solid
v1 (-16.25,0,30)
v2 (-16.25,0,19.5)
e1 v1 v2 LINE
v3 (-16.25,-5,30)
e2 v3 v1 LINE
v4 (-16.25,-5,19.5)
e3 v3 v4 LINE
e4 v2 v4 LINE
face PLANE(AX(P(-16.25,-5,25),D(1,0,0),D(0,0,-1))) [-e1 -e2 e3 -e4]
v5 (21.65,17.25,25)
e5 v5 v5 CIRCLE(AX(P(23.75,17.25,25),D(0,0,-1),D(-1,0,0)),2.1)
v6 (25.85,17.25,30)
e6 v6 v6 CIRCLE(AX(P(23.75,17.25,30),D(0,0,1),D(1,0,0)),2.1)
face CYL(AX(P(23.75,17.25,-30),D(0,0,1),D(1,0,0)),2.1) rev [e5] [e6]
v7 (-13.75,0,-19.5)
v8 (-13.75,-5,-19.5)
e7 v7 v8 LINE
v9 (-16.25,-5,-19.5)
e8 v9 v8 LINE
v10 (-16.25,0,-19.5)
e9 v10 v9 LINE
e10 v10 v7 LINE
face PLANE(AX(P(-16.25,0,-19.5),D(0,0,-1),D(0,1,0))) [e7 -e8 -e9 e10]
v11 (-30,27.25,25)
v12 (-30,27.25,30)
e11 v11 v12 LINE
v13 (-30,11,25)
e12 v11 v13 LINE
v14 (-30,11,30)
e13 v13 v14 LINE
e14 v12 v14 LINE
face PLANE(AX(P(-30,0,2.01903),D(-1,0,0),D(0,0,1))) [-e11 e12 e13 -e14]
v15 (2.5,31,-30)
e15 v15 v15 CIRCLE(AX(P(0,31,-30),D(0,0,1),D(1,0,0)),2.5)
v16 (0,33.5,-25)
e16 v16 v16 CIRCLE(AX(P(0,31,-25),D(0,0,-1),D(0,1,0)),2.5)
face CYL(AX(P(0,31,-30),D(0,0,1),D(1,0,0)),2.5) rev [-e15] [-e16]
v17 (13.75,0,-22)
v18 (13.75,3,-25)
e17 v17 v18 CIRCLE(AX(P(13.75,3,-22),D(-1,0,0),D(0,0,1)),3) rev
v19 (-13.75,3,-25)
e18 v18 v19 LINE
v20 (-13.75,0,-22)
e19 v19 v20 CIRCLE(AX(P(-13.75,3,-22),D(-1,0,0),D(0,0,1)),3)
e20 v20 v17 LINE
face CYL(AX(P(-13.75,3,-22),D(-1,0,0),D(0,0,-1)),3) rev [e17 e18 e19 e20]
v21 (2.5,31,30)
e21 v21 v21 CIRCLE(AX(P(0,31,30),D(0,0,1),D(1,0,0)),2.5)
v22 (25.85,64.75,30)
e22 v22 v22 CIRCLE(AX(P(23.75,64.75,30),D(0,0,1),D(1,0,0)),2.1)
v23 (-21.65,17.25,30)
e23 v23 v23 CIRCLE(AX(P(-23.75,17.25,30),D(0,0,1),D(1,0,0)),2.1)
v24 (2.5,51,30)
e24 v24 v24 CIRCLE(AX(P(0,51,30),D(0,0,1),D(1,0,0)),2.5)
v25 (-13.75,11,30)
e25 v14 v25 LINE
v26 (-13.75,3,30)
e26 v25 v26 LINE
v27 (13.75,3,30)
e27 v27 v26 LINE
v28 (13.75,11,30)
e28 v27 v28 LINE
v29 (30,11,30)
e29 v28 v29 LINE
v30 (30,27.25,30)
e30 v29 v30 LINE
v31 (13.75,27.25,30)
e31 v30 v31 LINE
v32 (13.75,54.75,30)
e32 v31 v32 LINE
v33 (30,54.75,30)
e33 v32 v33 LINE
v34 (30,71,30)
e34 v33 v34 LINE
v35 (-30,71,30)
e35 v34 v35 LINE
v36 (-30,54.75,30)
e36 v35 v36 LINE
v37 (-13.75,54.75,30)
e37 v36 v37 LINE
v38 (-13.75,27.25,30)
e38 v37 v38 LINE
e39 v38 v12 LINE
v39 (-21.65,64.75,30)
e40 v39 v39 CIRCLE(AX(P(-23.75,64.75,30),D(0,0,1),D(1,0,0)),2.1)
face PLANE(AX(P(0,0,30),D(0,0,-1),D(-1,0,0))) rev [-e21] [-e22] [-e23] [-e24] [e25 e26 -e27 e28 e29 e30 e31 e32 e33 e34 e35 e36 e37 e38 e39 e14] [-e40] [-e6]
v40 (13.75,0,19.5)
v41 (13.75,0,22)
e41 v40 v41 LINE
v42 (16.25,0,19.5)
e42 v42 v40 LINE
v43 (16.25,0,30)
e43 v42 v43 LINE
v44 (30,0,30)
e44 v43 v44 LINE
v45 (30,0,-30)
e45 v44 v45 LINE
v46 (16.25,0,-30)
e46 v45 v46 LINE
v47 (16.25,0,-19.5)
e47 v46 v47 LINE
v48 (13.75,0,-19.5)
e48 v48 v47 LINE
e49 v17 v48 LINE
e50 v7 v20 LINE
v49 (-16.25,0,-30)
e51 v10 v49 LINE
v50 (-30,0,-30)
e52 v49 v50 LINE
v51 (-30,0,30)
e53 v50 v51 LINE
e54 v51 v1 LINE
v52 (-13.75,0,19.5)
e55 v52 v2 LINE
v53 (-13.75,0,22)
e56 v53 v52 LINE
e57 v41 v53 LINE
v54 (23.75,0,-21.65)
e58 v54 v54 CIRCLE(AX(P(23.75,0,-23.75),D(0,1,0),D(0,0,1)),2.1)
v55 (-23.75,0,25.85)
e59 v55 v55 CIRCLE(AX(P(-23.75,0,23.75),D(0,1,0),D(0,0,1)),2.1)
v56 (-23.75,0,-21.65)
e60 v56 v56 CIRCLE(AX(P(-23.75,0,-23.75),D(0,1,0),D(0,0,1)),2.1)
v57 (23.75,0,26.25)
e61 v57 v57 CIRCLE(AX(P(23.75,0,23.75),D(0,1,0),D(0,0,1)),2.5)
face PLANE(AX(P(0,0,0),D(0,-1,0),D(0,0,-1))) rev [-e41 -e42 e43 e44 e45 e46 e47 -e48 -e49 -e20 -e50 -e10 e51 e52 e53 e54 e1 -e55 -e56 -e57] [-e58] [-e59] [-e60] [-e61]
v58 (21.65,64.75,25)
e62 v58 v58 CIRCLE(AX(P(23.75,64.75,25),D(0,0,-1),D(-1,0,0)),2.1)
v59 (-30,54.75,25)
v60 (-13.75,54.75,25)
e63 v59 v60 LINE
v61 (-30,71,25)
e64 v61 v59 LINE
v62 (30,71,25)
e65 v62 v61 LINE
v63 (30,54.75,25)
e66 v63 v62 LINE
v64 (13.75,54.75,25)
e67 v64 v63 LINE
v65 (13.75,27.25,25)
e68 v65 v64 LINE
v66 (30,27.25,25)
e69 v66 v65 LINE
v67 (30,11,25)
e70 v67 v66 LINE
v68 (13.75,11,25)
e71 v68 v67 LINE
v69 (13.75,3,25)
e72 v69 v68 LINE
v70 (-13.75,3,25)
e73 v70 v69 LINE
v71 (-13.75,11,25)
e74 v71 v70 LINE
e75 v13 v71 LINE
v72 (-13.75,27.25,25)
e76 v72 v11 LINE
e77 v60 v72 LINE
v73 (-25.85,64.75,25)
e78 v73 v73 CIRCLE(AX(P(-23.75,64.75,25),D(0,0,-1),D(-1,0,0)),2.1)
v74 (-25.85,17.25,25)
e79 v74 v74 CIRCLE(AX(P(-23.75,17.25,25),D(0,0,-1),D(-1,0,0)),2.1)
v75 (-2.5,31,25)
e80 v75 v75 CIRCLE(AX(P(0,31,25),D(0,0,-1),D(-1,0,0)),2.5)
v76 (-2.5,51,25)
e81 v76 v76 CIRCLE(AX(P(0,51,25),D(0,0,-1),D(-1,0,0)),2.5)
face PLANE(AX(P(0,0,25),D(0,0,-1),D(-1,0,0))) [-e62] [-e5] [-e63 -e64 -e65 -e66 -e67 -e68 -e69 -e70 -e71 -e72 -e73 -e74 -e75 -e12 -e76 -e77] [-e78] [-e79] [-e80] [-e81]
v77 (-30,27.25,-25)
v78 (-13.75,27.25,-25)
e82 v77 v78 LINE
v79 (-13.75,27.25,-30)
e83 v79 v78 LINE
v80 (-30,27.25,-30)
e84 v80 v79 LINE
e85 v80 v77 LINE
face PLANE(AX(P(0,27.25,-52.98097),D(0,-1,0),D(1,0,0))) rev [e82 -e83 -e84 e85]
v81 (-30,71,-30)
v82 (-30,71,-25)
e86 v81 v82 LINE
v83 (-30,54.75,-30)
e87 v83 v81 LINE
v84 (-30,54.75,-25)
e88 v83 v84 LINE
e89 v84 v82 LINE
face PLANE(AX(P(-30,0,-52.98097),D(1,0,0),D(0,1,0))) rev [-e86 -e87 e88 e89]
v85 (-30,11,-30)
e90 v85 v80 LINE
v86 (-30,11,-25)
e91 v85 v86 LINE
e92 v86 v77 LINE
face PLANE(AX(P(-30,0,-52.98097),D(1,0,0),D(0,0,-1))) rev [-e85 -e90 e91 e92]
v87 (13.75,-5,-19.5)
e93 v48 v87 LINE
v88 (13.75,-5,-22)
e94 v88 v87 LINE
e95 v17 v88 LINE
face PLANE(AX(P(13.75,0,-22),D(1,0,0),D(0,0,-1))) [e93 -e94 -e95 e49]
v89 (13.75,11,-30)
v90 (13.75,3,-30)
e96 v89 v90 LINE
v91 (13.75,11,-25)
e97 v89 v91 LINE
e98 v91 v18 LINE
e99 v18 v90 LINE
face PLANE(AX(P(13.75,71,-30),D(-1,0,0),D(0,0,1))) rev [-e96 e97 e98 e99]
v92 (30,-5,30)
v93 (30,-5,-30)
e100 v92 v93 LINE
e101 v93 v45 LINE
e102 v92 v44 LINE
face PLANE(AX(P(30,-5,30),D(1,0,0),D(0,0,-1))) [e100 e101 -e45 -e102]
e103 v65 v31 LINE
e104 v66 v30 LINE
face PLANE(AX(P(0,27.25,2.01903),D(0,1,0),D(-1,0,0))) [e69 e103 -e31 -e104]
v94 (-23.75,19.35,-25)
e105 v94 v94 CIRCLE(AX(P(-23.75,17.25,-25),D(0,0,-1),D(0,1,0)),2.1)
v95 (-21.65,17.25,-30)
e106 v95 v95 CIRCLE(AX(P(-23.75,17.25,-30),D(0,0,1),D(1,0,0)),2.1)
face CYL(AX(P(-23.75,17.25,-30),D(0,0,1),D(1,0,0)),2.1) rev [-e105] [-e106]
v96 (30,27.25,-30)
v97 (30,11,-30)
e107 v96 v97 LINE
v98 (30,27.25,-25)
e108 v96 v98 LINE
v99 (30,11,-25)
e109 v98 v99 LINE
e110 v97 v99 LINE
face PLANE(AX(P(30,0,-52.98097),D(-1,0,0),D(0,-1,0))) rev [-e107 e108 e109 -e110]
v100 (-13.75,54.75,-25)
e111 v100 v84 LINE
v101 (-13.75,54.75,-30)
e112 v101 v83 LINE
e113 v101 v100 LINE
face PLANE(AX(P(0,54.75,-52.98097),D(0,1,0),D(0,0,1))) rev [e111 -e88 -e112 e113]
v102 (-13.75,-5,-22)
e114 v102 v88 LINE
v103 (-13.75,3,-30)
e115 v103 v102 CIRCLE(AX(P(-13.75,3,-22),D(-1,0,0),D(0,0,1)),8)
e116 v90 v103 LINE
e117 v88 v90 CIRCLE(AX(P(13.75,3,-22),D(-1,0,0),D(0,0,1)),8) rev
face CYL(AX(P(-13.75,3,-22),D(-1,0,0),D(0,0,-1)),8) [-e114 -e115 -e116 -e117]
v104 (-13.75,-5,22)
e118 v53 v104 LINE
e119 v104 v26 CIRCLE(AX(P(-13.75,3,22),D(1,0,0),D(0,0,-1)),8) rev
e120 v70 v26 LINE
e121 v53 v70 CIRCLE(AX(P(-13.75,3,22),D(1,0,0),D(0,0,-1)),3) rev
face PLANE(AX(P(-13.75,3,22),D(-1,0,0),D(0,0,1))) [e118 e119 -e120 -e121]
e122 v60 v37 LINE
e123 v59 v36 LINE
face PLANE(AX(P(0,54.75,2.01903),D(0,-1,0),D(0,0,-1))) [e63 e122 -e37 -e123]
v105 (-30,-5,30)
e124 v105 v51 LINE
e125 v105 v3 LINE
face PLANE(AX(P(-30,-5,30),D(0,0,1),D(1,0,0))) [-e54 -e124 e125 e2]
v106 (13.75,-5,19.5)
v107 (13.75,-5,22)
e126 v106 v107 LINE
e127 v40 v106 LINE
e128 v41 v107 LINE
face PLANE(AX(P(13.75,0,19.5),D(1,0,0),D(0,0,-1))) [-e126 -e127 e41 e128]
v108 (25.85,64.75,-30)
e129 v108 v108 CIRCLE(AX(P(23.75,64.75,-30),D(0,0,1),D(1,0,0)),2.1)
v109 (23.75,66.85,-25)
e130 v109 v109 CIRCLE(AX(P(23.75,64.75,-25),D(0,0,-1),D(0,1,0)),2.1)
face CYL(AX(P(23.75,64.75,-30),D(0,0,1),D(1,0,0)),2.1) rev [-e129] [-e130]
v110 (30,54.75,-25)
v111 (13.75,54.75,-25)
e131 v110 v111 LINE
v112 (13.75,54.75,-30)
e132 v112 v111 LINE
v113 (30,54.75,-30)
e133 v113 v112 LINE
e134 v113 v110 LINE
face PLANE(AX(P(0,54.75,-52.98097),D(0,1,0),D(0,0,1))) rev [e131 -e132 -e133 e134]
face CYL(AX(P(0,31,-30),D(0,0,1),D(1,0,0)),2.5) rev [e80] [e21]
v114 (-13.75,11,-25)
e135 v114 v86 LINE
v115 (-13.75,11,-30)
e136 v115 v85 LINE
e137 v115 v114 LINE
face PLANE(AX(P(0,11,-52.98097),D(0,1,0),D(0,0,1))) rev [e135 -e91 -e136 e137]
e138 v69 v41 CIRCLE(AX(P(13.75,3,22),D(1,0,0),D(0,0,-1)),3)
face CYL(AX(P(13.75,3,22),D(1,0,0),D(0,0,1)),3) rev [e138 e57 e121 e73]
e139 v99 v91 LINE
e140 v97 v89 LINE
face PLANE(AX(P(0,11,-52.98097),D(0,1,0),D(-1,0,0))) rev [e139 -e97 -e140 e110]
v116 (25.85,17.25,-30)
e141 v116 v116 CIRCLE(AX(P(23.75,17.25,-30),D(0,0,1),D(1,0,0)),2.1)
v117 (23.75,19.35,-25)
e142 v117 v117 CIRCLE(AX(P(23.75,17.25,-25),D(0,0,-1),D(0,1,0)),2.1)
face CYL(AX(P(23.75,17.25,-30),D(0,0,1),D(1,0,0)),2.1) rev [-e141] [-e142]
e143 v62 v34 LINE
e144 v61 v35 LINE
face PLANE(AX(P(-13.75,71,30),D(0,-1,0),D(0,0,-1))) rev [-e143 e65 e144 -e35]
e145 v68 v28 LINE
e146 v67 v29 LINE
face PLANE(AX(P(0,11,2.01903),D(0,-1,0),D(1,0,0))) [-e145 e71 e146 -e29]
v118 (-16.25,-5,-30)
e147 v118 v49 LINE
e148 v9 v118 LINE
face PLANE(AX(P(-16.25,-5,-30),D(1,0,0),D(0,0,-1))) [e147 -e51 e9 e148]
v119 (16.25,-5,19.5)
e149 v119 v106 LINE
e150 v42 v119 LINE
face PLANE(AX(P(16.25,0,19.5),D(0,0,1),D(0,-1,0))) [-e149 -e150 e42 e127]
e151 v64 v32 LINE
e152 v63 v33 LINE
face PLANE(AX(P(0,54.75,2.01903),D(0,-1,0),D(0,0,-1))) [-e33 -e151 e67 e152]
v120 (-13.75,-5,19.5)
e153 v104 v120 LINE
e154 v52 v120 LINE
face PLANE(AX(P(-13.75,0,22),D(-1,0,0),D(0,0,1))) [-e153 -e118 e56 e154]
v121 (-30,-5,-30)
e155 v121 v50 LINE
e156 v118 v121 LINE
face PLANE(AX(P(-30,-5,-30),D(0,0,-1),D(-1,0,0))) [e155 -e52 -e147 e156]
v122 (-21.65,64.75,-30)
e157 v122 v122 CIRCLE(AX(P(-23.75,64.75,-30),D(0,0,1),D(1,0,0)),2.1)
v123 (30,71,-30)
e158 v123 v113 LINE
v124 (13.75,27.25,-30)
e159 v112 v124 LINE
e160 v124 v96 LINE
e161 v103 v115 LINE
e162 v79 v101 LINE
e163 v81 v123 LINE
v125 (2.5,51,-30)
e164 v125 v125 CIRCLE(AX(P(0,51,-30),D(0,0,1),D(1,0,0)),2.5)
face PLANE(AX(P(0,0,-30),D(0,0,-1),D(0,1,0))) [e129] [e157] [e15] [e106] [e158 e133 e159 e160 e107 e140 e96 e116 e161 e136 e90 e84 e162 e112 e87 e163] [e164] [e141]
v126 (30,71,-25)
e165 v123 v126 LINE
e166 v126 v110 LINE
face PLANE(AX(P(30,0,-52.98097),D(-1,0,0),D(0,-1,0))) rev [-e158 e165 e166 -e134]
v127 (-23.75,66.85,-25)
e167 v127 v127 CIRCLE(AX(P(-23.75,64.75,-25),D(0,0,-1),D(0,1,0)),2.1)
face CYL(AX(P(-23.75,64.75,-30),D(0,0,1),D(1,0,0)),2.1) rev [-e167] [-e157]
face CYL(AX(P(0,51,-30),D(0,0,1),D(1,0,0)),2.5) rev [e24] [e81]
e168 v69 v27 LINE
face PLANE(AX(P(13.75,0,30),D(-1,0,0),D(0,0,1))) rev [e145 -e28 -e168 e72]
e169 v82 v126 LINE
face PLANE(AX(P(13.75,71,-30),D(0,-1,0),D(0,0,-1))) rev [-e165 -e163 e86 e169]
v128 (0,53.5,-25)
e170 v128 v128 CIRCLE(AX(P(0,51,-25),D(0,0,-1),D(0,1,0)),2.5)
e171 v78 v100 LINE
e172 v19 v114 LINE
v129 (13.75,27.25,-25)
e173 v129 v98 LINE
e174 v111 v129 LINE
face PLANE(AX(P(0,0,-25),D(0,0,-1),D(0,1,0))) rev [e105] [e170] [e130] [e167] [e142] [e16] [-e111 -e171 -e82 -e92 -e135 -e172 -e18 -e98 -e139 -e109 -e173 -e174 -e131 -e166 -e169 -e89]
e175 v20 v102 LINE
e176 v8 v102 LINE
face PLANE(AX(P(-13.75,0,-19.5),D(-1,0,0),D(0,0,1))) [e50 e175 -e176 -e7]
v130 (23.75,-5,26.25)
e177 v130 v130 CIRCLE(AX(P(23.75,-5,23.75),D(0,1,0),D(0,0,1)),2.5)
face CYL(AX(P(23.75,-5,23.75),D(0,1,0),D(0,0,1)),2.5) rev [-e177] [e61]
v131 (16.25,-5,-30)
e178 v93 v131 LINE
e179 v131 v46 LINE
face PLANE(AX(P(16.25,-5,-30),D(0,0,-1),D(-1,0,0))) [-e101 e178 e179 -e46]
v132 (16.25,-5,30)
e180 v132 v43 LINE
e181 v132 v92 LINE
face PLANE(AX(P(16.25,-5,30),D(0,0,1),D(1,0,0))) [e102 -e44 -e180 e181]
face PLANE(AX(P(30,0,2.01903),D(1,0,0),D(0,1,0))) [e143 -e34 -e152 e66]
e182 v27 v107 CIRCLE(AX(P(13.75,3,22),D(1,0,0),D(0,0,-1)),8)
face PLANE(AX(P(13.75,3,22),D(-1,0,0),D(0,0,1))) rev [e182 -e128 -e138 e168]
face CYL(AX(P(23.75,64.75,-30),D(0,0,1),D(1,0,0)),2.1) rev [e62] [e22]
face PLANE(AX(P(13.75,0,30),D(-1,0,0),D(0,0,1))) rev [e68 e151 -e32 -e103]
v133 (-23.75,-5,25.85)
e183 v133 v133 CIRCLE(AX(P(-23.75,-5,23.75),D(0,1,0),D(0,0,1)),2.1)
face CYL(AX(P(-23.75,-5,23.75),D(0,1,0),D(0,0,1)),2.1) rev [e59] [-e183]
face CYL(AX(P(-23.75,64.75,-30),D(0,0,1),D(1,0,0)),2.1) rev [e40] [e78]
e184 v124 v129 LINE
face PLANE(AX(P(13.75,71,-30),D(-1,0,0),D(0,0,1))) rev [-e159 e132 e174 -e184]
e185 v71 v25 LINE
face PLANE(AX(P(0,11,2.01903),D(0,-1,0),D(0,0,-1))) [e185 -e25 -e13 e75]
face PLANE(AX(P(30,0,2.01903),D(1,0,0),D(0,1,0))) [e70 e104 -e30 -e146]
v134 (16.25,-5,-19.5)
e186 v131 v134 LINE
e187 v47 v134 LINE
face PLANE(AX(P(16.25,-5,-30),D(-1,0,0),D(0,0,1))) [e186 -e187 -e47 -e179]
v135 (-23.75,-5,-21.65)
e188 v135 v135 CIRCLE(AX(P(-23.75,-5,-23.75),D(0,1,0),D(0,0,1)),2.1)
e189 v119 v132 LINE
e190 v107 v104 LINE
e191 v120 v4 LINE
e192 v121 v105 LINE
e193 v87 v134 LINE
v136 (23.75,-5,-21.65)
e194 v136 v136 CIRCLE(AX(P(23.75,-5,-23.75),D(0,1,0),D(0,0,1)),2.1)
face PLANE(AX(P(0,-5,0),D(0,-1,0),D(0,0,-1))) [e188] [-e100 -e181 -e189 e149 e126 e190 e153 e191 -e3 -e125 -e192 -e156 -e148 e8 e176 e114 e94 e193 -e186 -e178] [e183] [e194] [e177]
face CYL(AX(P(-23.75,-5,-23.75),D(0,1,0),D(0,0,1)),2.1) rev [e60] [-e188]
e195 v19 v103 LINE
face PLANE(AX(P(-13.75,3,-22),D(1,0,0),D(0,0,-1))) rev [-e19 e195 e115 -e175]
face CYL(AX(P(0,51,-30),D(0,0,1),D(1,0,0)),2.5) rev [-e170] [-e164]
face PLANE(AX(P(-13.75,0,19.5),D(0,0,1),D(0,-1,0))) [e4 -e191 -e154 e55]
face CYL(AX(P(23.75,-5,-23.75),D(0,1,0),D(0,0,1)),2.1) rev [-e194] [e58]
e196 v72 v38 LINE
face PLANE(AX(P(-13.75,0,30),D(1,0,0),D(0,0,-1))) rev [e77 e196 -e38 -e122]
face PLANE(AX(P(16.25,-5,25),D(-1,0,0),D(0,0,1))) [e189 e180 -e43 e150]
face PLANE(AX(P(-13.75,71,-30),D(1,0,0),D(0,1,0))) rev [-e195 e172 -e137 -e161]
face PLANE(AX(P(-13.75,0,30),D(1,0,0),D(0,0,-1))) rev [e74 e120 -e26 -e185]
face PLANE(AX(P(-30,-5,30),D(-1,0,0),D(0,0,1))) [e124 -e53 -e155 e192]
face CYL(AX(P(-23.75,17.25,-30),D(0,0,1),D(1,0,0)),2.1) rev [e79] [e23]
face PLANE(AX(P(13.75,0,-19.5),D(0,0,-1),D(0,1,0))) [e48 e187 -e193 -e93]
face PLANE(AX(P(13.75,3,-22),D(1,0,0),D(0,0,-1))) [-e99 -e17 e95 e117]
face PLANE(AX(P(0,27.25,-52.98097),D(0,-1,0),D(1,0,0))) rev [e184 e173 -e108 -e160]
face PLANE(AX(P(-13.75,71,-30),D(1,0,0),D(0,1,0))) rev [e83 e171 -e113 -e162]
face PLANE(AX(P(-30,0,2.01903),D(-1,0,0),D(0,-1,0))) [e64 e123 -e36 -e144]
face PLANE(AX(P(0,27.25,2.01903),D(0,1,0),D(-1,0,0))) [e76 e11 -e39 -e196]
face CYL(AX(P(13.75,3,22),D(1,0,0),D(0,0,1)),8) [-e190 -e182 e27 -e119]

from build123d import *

# Parameters (mm, degrees)
SKETCH_16_R                       = 2.1
SKETCH_16_R_2                     = 2.5
SM_BASE_FLANGE_2_DEPTH            = 5
SM_EDGE_FLANGE_1_STRIP_W          = 26
SM_EDGE_FLANGE_1_STRIP_H          = 5
SM_EDGE_FLANGE_1_STRIP_CUT_DEPTH  = 27.5
SM_EDGE_FLANGE_1_RELIEF_W         = 28.5
SM_EDGE_FLANGE_1_RELIEF_H         = 2.5
SM_EDGE_FLANGE_1_RELIEF_CUT_DEPTH = 5
SM_EDGE_FLANGE_1_DEPTH            = 27.5
SM_EDGE_FLANGE_2_STRIP_W          = 26
SM_EDGE_FLANGE_2_STRIP_H          = 5
SM_EDGE_FLANGE_2_STRIP_CUT_DEPTH  = 27.5
SM_EDGE_FLANGE_2_RELIEF_W         = 28.5
SM_EDGE_FLANGE_2_RELIEF_H         = 2.5
SM_EDGE_FLANGE_2_RELIEF_CUT_DEPTH = 5
SM_EDGE_FLANGE_2_DEPTH            = 27.5
EXTRUDE_START                     = 30
SKETCH_23_W                       = 16.25
SKETCH_23_H                       = 16.25
EXTRUDE_1_DEPTH                   = 5
EXTRUDE_START_2                   = -25
SKETCH_24_W                       = 16.25
SKETCH_24_H                       = 16.25
EXTRUDE_2_DEPTH                   = 5
CUT_EXTRUDE_1_DEPTH               = 83.710337927
CUT_EXTRUDE_1_DEPTH_BACK          = 83.710337927
SKETCH_25_R                       = 2.1
CUT_EXTRUDE_2_DEPTH               = 83.710337927
CUT_EXTRUDE_2_DEPTH_BACK          = 83.710337927
SKETCH_26_R                       = 2.5


# Sheet-metal steps are written as plain solids
with BuildPart() as part:
    # 草图16 → 基体-法兰2 (new body)
    with BuildSketch(Plane(origin=(0, 0, 0), x_dir=(1, 0, 0), z_dir=(0, 1, 0))):
        Polygon((16.25, 30), (30, 30), (30, -30), (16.25, -30), (16.25, -25), (-16.25, -25), (-16.25, -30), (-30, -30), (-30, 30), (-16.25, 30), (-16.25, 25), (16.25, 25), align=None)
        with Locations(Location((-23.75, 23.75, 0), (0, 0, 270))):
            Circle(SKETCH_16_R, mode=Mode.SUBTRACT)
        with Locations(Location((-23.75, -23.75, 0), (0, 0, 270))):
            Circle(SKETCH_16_R, mode=Mode.SUBTRACT)
        with Locations(Location((23.75, 23.75, 0), (0, 0, 270))):
            Circle(SKETCH_16_R, mode=Mode.SUBTRACT)
        with Locations(Location((23.75, -23.75, 0), (0, 0, 270))):
            Circle(SKETCH_16_R_2, mode=Mode.SUBTRACT)
    extrude(amount=-SM_BASE_FLANGE_2_DEPTH)

    # 边线-法兰1 strip (across the edge) → 边线-法兰1 strip cut (cut)
    with BuildSketch(Plane(origin=(-13.75, 0, 25), x_dir=(0, 0, -1), z_dir=(1, 0, 0))):
        with Locations((-10, -2.5)):
            Rectangle(SM_EDGE_FLANGE_1_STRIP_W, SM_EDGE_FLANGE_1_STRIP_H)
    extrude(amount=SM_EDGE_FLANGE_1_STRIP_CUT_DEPTH, mode=Mode.SUBTRACT)

    # 边线-法兰1 relief (on the sheet) → 边线-法兰1 relief cut (cut)
    with BuildSketch(Plane(origin=(-13.75, 0, 22), x_dir=(0, 0, -1), z_dir=(0, 1, 0))):
        with Locations((-11.75, 1.25)):
            Rectangle(SM_EDGE_FLANGE_1_RELIEF_W, SM_EDGE_FLANGE_1_RELIEF_H)
        with Locations((-11.75, -28.75)):
            Rectangle(SM_EDGE_FLANGE_1_RELIEF_W, SM_EDGE_FLANGE_1_RELIEF_H)
    extrude(amount=-SM_EDGE_FLANGE_1_RELIEF_CUT_DEPTH, mode=Mode.SUBTRACT)

    # 边线-法兰1 section (across the edge) → 边线-法兰1 (add)
    with BuildSketch(Plane(origin=(-13.75, 0, 25), x_dir=(0, 0, -1), z_dir=(1, 0, 0))):
        with BuildLine():
            Line((-5, 3), (-5, 71))
            Line((-5, 71), (0, 71))
            Line((0, 71), (0, 3))
            ThreePointArc((0, 3), (0.878679656, 0.878679656), (3, 0))
            Line((3, 0), (3, -5))
            ThreePointArc((3, -5), (-2.656854249, -2.656854249), (-5, 3))
        make_face()
    extrude(amount=SM_EDGE_FLANGE_1_DEPTH)

    # 边线-法兰2 strip (across the edge) → 边线-法兰2 strip cut (cut)
    with BuildSketch(Plane(origin=(13.75, 0, -25), x_dir=(0, 0, 1), z_dir=(-1, 0, 0))):
        with Locations((-10, -2.5)):
            Rectangle(SM_EDGE_FLANGE_2_STRIP_W, SM_EDGE_FLANGE_2_STRIP_H)
    extrude(amount=SM_EDGE_FLANGE_2_STRIP_CUT_DEPTH, mode=Mode.SUBTRACT)

    # 边线-法兰2 relief (on the sheet) → 边线-法兰2 relief cut (cut)
    with BuildSketch(Plane(origin=(13.75, 0, -22), x_dir=(0, 0, 1), z_dir=(0, 1, 0))):
        with Locations((-11.75, 1.25)):
            Rectangle(SM_EDGE_FLANGE_2_RELIEF_W, SM_EDGE_FLANGE_2_RELIEF_H)
        with Locations((-11.75, -28.75)):
            Rectangle(SM_EDGE_FLANGE_2_RELIEF_W, SM_EDGE_FLANGE_2_RELIEF_H)
    extrude(amount=-SM_EDGE_FLANGE_2_RELIEF_CUT_DEPTH, mode=Mode.SUBTRACT)

    # 边线-法兰2 section (across the edge) → 边线-法兰2 (add)
    with BuildSketch(Plane(origin=(13.75, 0, -25), x_dir=(0, 0, 1), z_dir=(-1, 0, 0))):
        with BuildLine():
            Line((-5, 3), (-5, 71))
            Line((-5, 71), (0, 71))
            Line((0, 71), (0, 3))
            ThreePointArc((0, 3), (0.878679656, 0.878679656), (3, 0))
            Line((3, 0), (3, -5))
            ThreePointArc((3, -5), (-2.656854249, -2.656854249), (-5, 3))
        make_face()
    extrude(amount=SM_EDGE_FLANGE_2_DEPTH)

    # 草图23 → 凸台-拉伸1 (add)
    with BuildSketch(Plane.XY.offset(EXTRUDE_START)):
        with Locations((-21.875, 62.875)):
            Rectangle(SKETCH_23_W, SKETCH_23_H)
        with Locations((21.875, 62.875)):
            Rectangle(SKETCH_23_W, SKETCH_23_H)
        with Locations((21.875, 19.125)):
            Rectangle(SKETCH_23_W, SKETCH_23_H)
        with Locations((-21.875, 19.125)):
            Rectangle(SKETCH_23_W, SKETCH_23_H)
    extrude(amount=-EXTRUDE_1_DEPTH)

    # 草图24 → 凸台-拉伸2 (add)
    with BuildSketch(Plane.XY.offset(EXTRUDE_START_2)):
        with Locations((21.875, 62.875)):
            Rectangle(SKETCH_24_W, SKETCH_24_H)
        with Locations((-21.875, 62.875)):
            Rectangle(SKETCH_24_W, SKETCH_24_H)
        with Locations((-21.875, 19.125)):
            Rectangle(SKETCH_24_W, SKETCH_24_H)
        with Locations((21.875, 19.125)):
            Rectangle(SKETCH_24_W, SKETCH_24_H)
    extrude(amount=-EXTRUDE_2_DEPTH)

    # 草图25 → 切除-拉伸1 (cut, two sides: drawn at the far end of the back side and taken through both)
    with BuildSketch(Plane.XY.offset(-CUT_EXTRUDE_1_DEPTH_BACK)):
        with Locations((-23.75, 64.75)):
            Circle(SKETCH_25_R)
        with Locations((23.75, 64.75)):
            Circle(SKETCH_25_R)
        with Locations((-23.75, 17.25)):
            Circle(SKETCH_25_R)
        with Locations((23.75, 17.25)):
            Circle(SKETCH_25_R)
    extrude(amount=CUT_EXTRUDE_1_DEPTH + CUT_EXTRUDE_1_DEPTH_BACK, mode=Mode.SUBTRACT)

    # 草图26 → 切除-拉伸2 (cut, two sides: drawn at the far end of the back side and taken through both)
    with BuildSketch(Plane.XY.offset(-CUT_EXTRUDE_2_DEPTH_BACK)):
        with Locations((0, 51)):
            Circle(SKETCH_26_R)
        with Locations((0, 31)):
            Circle(SKETCH_26_R)
    extrude(amount=CUT_EXTRUDE_2_DEPTH + CUT_EXTRUDE_2_DEPTH_BACK, mode=Mode.SUBTRACT)


solid = part.part
